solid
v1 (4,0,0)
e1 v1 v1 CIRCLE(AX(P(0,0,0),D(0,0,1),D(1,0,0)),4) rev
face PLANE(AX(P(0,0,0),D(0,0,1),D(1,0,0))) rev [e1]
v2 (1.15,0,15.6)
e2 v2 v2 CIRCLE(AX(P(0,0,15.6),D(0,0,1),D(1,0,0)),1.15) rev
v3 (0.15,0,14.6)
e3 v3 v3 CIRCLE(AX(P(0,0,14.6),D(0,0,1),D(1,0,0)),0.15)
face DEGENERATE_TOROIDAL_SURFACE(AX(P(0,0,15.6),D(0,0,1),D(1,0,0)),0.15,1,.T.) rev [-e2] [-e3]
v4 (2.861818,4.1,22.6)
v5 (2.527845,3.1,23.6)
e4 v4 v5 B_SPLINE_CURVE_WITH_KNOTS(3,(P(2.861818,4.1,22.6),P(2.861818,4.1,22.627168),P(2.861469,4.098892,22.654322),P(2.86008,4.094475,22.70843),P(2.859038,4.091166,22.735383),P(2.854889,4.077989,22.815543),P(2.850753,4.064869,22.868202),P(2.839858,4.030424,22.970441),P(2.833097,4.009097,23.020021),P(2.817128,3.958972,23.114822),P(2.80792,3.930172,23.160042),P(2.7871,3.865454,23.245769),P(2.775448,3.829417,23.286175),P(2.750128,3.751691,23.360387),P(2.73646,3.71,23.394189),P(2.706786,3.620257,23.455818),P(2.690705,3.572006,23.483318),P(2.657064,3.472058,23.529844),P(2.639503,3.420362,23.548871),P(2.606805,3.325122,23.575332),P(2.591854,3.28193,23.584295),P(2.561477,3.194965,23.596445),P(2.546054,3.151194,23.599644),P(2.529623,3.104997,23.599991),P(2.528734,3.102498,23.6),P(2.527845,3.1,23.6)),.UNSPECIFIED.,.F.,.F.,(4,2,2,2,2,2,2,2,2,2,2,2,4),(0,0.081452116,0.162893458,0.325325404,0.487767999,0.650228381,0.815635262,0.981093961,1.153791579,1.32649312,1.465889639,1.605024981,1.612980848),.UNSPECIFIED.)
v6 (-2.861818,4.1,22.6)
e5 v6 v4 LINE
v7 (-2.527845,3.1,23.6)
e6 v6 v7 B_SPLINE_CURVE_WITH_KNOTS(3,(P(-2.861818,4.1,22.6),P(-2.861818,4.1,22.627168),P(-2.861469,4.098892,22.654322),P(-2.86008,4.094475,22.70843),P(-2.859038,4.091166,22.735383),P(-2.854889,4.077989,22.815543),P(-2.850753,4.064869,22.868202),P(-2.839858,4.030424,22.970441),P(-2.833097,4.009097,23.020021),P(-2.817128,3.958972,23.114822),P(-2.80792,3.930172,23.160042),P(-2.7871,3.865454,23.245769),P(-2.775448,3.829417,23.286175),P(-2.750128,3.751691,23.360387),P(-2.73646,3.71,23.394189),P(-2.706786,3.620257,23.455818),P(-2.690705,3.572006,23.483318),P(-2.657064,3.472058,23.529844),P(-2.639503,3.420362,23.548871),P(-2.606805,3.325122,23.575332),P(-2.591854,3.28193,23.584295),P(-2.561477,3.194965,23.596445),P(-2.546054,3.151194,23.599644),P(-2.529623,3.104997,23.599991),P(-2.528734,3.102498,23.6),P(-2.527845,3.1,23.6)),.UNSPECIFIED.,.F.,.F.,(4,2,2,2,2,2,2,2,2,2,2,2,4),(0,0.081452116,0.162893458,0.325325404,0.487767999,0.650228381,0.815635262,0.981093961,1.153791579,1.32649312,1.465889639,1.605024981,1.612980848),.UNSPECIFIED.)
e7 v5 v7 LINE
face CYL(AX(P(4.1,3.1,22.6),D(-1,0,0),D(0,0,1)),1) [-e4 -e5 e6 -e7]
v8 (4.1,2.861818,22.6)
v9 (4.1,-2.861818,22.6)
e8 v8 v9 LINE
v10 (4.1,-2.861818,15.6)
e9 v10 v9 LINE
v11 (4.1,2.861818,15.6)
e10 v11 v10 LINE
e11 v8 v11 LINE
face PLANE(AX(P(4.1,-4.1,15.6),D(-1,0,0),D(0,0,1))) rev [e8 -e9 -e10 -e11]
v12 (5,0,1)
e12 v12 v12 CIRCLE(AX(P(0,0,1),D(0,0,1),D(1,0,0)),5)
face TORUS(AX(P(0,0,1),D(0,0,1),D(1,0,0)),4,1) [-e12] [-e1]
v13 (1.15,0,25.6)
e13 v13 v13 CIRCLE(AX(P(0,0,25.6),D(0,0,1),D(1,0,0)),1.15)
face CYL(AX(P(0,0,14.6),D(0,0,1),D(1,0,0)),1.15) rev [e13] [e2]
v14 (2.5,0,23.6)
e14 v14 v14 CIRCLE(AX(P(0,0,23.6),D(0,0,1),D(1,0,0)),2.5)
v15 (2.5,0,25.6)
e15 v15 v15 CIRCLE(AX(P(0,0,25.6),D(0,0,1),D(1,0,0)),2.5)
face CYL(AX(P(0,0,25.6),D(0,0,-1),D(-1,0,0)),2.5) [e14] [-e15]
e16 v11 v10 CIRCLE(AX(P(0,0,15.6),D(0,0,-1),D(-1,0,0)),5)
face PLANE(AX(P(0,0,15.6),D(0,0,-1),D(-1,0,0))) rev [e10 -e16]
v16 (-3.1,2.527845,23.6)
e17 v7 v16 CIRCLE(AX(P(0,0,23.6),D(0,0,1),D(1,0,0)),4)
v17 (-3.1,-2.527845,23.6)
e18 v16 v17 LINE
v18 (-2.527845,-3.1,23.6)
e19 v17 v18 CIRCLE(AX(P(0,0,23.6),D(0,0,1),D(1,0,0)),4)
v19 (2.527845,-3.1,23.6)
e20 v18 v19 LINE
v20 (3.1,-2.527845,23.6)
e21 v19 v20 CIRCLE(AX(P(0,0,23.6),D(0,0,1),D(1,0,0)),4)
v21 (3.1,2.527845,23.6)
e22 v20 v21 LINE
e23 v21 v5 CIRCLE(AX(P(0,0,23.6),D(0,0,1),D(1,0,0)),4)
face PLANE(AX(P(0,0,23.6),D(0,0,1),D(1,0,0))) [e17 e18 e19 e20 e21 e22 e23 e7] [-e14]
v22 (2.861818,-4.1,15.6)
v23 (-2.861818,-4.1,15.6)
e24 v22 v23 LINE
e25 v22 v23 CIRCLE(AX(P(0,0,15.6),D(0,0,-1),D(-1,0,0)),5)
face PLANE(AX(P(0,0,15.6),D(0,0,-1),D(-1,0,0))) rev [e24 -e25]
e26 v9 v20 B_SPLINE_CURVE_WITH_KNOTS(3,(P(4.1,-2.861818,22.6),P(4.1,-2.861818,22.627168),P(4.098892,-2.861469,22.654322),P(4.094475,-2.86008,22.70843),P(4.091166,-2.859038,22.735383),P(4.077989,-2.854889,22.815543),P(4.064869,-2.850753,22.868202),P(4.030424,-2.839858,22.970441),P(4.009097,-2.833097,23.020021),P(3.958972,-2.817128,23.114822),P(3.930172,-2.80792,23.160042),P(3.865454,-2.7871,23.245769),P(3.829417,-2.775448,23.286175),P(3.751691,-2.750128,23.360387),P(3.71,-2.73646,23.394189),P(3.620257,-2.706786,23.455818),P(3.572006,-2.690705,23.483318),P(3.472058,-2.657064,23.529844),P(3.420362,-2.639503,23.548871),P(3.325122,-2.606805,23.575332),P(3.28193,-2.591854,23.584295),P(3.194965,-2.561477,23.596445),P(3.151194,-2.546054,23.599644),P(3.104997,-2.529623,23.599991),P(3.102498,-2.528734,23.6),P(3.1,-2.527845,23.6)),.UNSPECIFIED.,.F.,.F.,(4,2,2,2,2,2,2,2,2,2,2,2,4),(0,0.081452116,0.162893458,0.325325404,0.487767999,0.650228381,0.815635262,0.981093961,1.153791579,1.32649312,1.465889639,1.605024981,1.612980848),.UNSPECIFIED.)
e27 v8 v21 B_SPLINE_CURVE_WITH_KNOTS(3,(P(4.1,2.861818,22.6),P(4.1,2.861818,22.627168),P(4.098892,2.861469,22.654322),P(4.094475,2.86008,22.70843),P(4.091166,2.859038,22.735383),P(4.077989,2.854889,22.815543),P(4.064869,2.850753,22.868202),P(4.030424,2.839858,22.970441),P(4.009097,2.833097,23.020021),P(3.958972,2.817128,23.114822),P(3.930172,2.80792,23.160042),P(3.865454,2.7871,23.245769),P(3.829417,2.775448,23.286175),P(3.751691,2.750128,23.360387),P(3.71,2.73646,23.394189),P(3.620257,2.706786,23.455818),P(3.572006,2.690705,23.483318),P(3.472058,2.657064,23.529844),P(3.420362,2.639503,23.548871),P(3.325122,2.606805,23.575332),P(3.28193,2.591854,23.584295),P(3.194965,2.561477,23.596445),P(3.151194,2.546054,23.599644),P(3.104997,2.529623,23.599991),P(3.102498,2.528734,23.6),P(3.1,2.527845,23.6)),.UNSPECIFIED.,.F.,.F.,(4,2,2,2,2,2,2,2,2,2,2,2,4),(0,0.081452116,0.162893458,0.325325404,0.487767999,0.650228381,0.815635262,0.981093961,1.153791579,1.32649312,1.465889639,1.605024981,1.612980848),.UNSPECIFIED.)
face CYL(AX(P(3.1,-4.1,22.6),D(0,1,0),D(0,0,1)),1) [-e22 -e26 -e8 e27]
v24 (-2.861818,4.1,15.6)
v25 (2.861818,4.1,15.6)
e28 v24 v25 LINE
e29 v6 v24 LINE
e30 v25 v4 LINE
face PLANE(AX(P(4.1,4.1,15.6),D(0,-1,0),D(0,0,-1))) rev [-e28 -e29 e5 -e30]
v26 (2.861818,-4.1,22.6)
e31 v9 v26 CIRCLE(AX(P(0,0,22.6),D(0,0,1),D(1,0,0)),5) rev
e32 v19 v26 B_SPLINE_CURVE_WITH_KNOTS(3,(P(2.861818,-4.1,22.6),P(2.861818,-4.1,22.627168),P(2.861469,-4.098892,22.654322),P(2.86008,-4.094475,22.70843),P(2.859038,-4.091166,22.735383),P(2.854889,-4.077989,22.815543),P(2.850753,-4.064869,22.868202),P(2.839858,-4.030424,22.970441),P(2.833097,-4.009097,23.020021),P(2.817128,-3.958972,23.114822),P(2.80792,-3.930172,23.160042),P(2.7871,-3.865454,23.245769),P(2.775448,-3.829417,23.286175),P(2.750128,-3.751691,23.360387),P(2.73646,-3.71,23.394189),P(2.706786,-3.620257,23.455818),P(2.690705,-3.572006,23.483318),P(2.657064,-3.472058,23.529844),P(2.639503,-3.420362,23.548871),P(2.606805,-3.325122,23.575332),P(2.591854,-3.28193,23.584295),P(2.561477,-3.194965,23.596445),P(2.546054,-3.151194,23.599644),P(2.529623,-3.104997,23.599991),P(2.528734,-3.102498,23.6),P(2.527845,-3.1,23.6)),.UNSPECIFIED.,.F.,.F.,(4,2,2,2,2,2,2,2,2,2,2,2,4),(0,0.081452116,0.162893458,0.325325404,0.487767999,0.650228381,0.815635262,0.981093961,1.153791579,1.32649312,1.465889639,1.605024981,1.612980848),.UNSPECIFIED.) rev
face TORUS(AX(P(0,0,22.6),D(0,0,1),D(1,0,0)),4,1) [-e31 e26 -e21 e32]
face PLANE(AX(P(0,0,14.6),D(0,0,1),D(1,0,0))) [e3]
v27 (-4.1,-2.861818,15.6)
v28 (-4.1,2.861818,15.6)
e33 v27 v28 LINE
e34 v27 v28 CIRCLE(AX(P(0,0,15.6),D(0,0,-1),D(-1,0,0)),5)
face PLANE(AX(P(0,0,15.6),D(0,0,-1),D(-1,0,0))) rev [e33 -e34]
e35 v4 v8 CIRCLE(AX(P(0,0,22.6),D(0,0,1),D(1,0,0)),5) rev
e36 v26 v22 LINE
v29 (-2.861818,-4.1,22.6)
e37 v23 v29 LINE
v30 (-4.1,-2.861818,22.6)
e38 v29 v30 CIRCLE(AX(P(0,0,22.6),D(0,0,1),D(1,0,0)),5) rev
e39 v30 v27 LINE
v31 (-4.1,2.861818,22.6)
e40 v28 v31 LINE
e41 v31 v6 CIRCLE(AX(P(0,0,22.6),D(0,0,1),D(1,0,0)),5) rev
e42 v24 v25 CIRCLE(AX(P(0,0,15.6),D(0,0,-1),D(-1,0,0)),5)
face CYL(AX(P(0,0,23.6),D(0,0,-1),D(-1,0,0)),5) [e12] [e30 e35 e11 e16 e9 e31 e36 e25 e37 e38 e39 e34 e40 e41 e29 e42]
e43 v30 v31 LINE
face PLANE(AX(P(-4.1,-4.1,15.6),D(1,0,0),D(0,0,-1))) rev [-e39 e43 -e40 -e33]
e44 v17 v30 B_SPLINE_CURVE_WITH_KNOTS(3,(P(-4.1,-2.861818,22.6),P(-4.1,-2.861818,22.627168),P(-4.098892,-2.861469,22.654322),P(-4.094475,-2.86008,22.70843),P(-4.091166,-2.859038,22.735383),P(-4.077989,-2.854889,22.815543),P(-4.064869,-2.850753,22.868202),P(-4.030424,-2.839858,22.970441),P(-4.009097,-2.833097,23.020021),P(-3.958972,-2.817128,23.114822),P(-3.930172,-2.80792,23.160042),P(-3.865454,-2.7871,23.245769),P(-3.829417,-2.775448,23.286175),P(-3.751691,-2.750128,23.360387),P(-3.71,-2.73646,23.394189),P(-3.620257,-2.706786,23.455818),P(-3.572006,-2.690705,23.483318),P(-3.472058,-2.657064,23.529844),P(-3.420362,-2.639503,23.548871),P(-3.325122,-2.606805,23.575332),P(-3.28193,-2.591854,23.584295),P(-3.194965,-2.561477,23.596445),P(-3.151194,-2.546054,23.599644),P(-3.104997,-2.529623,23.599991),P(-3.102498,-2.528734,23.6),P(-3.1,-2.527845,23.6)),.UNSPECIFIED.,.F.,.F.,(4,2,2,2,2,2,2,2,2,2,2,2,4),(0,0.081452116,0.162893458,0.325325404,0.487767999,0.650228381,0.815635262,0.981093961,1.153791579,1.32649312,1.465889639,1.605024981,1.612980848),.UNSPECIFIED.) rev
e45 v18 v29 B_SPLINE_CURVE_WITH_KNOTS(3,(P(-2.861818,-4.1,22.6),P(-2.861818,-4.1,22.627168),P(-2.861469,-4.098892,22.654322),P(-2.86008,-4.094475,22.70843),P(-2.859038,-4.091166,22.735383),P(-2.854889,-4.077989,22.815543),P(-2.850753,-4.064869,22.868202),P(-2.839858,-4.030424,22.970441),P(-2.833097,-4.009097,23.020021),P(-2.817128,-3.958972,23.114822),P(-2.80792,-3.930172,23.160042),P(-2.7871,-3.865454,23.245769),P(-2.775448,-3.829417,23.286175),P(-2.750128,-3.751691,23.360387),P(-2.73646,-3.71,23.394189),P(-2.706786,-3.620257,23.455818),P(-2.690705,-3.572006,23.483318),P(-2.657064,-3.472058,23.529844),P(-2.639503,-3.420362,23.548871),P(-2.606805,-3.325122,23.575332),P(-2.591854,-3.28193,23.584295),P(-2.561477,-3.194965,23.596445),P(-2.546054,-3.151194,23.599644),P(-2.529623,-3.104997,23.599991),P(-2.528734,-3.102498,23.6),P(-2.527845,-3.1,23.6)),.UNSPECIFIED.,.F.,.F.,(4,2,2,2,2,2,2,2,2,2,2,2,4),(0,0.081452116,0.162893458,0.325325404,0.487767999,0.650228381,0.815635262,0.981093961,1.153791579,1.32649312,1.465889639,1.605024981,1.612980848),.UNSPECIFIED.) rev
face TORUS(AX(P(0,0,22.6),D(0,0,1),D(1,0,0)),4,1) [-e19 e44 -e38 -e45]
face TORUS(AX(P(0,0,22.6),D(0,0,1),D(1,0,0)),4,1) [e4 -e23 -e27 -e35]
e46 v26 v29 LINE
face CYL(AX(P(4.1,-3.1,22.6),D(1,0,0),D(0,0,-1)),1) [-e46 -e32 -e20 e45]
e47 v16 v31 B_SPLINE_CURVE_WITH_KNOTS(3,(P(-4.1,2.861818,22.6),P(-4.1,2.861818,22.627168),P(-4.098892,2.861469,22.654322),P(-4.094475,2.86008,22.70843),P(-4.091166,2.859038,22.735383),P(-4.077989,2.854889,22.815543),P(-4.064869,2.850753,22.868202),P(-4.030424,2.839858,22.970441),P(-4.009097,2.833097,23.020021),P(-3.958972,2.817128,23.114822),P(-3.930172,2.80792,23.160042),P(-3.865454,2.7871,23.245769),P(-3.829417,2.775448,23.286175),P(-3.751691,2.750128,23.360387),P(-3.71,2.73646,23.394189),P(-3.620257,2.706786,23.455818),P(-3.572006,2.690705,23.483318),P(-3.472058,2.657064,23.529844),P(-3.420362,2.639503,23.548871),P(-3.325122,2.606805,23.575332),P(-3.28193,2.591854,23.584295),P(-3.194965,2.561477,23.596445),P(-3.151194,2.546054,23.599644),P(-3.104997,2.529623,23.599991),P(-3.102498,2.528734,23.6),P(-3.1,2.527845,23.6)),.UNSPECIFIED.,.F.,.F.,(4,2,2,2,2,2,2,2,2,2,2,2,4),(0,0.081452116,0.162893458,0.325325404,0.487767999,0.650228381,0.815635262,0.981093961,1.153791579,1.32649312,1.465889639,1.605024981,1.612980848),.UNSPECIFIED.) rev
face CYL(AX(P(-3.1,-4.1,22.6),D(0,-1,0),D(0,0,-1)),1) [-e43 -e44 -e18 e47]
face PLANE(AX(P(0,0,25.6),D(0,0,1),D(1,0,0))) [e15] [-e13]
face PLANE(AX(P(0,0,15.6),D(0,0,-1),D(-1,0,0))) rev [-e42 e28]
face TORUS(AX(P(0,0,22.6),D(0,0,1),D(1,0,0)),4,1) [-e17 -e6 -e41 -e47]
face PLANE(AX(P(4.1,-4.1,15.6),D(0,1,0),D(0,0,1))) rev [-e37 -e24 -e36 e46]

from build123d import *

# Parameters (mm, degrees)
SKICA1_R                 = 5
P_IDAT_VYSUNUT_M1_DEPTH  = 23.6
SKICA2_OUTSIDE_W         = 17.502
SKICA2_OUTSIDE_H         = 17.502
SKICA2_OUTSIDE_W_2       = 8.2
SKICA2_OUTSIDE_H_2       = 8.2
ODEBRAT_VYSUNUT_M1_DEPTH = 8
SKICA3_R                 = 2.5
P_IDAT_VYSUNUT_M2_DEPTH  = 2
SKICA4_R                 = 1.15
ODEBRAT_VYSUNUT_M2_DEPTH = 11
ZAOBLIT1_R               = 1


with BuildPart() as part:
    # Skica1 → Přidat vysunutím1 (new body)
    with BuildSketch(Plane.XY):
        Circle(SKICA1_R)
    extrude(amount=P_IDAT_VYSUNUT_M1_DEPTH)

    # Skica2 outside → Odebrat vysunutím1 (cut)
    with BuildSketch(Plane(origin=(0, 0, 23.6), x_dir=(-1, 0, 0), z_dir=(0, 0, -1))):
        Rectangle(SKICA2_OUTSIDE_W, SKICA2_OUTSIDE_H)
        Rectangle(SKICA2_OUTSIDE_W_2, SKICA2_OUTSIDE_H_2, mode=Mode.SUBTRACT)
    extrude(amount=ODEBRAT_VYSUNUT_M1_DEPTH, mode=Mode.SUBTRACT)

    # Skica3 → Přidat vysunutím2 (add)
    with BuildSketch(Plane.XY.offset(23.6)):
        Circle(SKICA3_R)
    extrude(amount=P_IDAT_VYSUNUT_M2_DEPTH)

    # Skica4 → Odebrat vysunutím2 (cut)
    with BuildSketch(Plane.XY.offset(25.6)):
        Circle(SKICA4_R)
    extrude(amount=-ODEBRAT_VYSUNUT_M2_DEPTH, mode=Mode.SUBTRACT)

    # Zaoblit1
    # the kernel refuses this fillet: 1 mm, written as the material it adds along each edge
    with BuildSketch(Plane(origin=(0, 0, 14.6), x_dir=(1, 0, 0), z_dir=(0, -1, 0))) as zaoblit1_piece_1:
        with BuildLine():
            CenterArc((1.15 - ZAOBLIT1_R, ZAOBLIT1_R), ZAOBLIT1_R, 270, 90)
            Line((1.15 - ZAOBLIT1_R, 0), (1.15, 0))
            Line((1.15, 0), (1.15, ZAOBLIT1_R))
        make_face()
    revolve(axis=Axis((0, 0, 14.6), (0, 0, 1)))
    # the kernel refuses this fillet: 1 mm, written as the material it takes off along each edge
    with BuildSketch(Plane(origin=(0, 0, 0), x_dir=(1, 0, 0), z_dir=(0, -1, 0))) as zaoblit1_2_piece_1:
        with BuildLine():
            CenterArc((5 - ZAOBLIT1_R, ZAOBLIT1_R), ZAOBLIT1_R, 270, 90)
            Line((5 - ZAOBLIT1_R, 0), (5, 0))
            Line((5, 0), (5, ZAOBLIT1_R))
        make_face()
    revolve(axis=Axis((0, 0, 0), (0, 0, 1)), mode=Mode.SUBTRACT)
    with BuildSketch(Plane(origin=(0, 0, 23.6), x_dir=(0.9940244909072117, 0.109157278624279, 0), z_dir=(0.109157278624279, -0.9940244909072117, 0))) as zaoblit1_2_piece_2:
        with BuildLine():
            CenterArc((5 - ZAOBLIT1_R, -ZAOBLIT1_R), ZAOBLIT1_R, 0, 90)
            Line((5 - ZAOBLIT1_R, 0), (5, 0))
            Line((5, 0), (5, -ZAOBLIT1_R))
        make_face()
    revolve(axis=Axis((0, 0, 23.6), (0, 0, 1)), revolution_arc=77.466522668, mode=Mode.SUBTRACT)
    with BuildSketch(Plane(origin=(0, 0, 23.6), x_dir=(-0.10915727862431812, 0.9940244909072075, 0), z_dir=(0.9940244909072075, 0.10915727862431812, 0))) as zaoblit1_2_piece_3:
        with BuildLine():
            CenterArc((5 - ZAOBLIT1_R, -ZAOBLIT1_R), ZAOBLIT1_R, 0, 90)
            Line((5 - ZAOBLIT1_R, 0), (5, 0))
            Line((5, 0), (5, -ZAOBLIT1_R))
        make_face()
    revolve(axis=Axis((0, 0, 23.6), (0, 0, 1)), revolution_arc=77.466522668, mode=Mode.SUBTRACT)
    with BuildSketch(Plane(origin=(0, 0, 23.6), x_dir=(-0.9940244909072075, -0.1091572786243185, 0), z_dir=(-0.1091572786243185, 0.9940244909072075, 0))) as zaoblit1_2_piece_4:
        with BuildLine():
            CenterArc((5 - ZAOBLIT1_R, -ZAOBLIT1_R), ZAOBLIT1_R, 0, 90)
            Line((5 - ZAOBLIT1_R, 0), (5, 0))
            Line((5, 0), (5, -ZAOBLIT1_R))
        make_face()
    revolve(axis=Axis((0, 0, 23.6), (0, 0, 1)), revolution_arc=77.466522668, mode=Mode.SUBTRACT)
    with BuildSketch(Plane(origin=(0, 0, 23.6), x_dir=(0.10915727862436878, -0.9940244909072019, 0), z_dir=(-0.9940244909072019, -0.10915727862436878, 0))) as zaoblit1_2_piece_5:
        with BuildLine():
            CenterArc((5 - ZAOBLIT1_R, -ZAOBLIT1_R), ZAOBLIT1_R, 0, 90)
            Line((5 - ZAOBLIT1_R, 0), (5, 0))
            Line((5, 0), (5, -ZAOBLIT1_R))
        make_face()
    revolve(axis=Axis((0, 0, 23.6), (0, 0, 1)), revolution_arc=77.466522668, mode=Mode.SUBTRACT)
    with BuildSketch(Plane(origin=(5.361817604, -4.1, 23.6), x_dir=(0, 1, 0), z_dir=(-1, 0, 0)), Plane(origin=(-5.361817604, 4.1, 23.6), x_dir=(0, -1, 0), z_dir=(1, 0, 0)), Plane(origin=(-4.1, -5.361817604, 23.6), x_dir=(1, 0, 0), z_dir=(0, 1, 0))) as zaoblit1_2_piece_6:
        with BuildLine():
            CenterArc((ZAOBLIT1_R, ZAOBLIT1_R), ZAOBLIT1_R, 180, 90)
            Line((0, ZAOBLIT1_R), (0, 0))
            Line((0, 0), (ZAOBLIT1_R, 0))
        make_face()
    extrude(amount=10.723635209, mode=Mode.SUBTRACT)
    with BuildSketch(Plane(origin=(4.1, 5.361817604, 23.6), x_dir=(0, 0, -1), z_dir=(0, -1, 0))) as zaoblit1_2_piece_7:
        with BuildLine():
            CenterArc((ZAOBLIT1_R, -ZAOBLIT1_R), ZAOBLIT1_R, 90, 90)
            Line((0, -ZAOBLIT1_R), (0, 0))
            Line((0, 0), (ZAOBLIT1_R, 0))
        make_face()
    extrude(amount=10.723635209, mode=Mode.SUBTRACT)


solid = part.part
